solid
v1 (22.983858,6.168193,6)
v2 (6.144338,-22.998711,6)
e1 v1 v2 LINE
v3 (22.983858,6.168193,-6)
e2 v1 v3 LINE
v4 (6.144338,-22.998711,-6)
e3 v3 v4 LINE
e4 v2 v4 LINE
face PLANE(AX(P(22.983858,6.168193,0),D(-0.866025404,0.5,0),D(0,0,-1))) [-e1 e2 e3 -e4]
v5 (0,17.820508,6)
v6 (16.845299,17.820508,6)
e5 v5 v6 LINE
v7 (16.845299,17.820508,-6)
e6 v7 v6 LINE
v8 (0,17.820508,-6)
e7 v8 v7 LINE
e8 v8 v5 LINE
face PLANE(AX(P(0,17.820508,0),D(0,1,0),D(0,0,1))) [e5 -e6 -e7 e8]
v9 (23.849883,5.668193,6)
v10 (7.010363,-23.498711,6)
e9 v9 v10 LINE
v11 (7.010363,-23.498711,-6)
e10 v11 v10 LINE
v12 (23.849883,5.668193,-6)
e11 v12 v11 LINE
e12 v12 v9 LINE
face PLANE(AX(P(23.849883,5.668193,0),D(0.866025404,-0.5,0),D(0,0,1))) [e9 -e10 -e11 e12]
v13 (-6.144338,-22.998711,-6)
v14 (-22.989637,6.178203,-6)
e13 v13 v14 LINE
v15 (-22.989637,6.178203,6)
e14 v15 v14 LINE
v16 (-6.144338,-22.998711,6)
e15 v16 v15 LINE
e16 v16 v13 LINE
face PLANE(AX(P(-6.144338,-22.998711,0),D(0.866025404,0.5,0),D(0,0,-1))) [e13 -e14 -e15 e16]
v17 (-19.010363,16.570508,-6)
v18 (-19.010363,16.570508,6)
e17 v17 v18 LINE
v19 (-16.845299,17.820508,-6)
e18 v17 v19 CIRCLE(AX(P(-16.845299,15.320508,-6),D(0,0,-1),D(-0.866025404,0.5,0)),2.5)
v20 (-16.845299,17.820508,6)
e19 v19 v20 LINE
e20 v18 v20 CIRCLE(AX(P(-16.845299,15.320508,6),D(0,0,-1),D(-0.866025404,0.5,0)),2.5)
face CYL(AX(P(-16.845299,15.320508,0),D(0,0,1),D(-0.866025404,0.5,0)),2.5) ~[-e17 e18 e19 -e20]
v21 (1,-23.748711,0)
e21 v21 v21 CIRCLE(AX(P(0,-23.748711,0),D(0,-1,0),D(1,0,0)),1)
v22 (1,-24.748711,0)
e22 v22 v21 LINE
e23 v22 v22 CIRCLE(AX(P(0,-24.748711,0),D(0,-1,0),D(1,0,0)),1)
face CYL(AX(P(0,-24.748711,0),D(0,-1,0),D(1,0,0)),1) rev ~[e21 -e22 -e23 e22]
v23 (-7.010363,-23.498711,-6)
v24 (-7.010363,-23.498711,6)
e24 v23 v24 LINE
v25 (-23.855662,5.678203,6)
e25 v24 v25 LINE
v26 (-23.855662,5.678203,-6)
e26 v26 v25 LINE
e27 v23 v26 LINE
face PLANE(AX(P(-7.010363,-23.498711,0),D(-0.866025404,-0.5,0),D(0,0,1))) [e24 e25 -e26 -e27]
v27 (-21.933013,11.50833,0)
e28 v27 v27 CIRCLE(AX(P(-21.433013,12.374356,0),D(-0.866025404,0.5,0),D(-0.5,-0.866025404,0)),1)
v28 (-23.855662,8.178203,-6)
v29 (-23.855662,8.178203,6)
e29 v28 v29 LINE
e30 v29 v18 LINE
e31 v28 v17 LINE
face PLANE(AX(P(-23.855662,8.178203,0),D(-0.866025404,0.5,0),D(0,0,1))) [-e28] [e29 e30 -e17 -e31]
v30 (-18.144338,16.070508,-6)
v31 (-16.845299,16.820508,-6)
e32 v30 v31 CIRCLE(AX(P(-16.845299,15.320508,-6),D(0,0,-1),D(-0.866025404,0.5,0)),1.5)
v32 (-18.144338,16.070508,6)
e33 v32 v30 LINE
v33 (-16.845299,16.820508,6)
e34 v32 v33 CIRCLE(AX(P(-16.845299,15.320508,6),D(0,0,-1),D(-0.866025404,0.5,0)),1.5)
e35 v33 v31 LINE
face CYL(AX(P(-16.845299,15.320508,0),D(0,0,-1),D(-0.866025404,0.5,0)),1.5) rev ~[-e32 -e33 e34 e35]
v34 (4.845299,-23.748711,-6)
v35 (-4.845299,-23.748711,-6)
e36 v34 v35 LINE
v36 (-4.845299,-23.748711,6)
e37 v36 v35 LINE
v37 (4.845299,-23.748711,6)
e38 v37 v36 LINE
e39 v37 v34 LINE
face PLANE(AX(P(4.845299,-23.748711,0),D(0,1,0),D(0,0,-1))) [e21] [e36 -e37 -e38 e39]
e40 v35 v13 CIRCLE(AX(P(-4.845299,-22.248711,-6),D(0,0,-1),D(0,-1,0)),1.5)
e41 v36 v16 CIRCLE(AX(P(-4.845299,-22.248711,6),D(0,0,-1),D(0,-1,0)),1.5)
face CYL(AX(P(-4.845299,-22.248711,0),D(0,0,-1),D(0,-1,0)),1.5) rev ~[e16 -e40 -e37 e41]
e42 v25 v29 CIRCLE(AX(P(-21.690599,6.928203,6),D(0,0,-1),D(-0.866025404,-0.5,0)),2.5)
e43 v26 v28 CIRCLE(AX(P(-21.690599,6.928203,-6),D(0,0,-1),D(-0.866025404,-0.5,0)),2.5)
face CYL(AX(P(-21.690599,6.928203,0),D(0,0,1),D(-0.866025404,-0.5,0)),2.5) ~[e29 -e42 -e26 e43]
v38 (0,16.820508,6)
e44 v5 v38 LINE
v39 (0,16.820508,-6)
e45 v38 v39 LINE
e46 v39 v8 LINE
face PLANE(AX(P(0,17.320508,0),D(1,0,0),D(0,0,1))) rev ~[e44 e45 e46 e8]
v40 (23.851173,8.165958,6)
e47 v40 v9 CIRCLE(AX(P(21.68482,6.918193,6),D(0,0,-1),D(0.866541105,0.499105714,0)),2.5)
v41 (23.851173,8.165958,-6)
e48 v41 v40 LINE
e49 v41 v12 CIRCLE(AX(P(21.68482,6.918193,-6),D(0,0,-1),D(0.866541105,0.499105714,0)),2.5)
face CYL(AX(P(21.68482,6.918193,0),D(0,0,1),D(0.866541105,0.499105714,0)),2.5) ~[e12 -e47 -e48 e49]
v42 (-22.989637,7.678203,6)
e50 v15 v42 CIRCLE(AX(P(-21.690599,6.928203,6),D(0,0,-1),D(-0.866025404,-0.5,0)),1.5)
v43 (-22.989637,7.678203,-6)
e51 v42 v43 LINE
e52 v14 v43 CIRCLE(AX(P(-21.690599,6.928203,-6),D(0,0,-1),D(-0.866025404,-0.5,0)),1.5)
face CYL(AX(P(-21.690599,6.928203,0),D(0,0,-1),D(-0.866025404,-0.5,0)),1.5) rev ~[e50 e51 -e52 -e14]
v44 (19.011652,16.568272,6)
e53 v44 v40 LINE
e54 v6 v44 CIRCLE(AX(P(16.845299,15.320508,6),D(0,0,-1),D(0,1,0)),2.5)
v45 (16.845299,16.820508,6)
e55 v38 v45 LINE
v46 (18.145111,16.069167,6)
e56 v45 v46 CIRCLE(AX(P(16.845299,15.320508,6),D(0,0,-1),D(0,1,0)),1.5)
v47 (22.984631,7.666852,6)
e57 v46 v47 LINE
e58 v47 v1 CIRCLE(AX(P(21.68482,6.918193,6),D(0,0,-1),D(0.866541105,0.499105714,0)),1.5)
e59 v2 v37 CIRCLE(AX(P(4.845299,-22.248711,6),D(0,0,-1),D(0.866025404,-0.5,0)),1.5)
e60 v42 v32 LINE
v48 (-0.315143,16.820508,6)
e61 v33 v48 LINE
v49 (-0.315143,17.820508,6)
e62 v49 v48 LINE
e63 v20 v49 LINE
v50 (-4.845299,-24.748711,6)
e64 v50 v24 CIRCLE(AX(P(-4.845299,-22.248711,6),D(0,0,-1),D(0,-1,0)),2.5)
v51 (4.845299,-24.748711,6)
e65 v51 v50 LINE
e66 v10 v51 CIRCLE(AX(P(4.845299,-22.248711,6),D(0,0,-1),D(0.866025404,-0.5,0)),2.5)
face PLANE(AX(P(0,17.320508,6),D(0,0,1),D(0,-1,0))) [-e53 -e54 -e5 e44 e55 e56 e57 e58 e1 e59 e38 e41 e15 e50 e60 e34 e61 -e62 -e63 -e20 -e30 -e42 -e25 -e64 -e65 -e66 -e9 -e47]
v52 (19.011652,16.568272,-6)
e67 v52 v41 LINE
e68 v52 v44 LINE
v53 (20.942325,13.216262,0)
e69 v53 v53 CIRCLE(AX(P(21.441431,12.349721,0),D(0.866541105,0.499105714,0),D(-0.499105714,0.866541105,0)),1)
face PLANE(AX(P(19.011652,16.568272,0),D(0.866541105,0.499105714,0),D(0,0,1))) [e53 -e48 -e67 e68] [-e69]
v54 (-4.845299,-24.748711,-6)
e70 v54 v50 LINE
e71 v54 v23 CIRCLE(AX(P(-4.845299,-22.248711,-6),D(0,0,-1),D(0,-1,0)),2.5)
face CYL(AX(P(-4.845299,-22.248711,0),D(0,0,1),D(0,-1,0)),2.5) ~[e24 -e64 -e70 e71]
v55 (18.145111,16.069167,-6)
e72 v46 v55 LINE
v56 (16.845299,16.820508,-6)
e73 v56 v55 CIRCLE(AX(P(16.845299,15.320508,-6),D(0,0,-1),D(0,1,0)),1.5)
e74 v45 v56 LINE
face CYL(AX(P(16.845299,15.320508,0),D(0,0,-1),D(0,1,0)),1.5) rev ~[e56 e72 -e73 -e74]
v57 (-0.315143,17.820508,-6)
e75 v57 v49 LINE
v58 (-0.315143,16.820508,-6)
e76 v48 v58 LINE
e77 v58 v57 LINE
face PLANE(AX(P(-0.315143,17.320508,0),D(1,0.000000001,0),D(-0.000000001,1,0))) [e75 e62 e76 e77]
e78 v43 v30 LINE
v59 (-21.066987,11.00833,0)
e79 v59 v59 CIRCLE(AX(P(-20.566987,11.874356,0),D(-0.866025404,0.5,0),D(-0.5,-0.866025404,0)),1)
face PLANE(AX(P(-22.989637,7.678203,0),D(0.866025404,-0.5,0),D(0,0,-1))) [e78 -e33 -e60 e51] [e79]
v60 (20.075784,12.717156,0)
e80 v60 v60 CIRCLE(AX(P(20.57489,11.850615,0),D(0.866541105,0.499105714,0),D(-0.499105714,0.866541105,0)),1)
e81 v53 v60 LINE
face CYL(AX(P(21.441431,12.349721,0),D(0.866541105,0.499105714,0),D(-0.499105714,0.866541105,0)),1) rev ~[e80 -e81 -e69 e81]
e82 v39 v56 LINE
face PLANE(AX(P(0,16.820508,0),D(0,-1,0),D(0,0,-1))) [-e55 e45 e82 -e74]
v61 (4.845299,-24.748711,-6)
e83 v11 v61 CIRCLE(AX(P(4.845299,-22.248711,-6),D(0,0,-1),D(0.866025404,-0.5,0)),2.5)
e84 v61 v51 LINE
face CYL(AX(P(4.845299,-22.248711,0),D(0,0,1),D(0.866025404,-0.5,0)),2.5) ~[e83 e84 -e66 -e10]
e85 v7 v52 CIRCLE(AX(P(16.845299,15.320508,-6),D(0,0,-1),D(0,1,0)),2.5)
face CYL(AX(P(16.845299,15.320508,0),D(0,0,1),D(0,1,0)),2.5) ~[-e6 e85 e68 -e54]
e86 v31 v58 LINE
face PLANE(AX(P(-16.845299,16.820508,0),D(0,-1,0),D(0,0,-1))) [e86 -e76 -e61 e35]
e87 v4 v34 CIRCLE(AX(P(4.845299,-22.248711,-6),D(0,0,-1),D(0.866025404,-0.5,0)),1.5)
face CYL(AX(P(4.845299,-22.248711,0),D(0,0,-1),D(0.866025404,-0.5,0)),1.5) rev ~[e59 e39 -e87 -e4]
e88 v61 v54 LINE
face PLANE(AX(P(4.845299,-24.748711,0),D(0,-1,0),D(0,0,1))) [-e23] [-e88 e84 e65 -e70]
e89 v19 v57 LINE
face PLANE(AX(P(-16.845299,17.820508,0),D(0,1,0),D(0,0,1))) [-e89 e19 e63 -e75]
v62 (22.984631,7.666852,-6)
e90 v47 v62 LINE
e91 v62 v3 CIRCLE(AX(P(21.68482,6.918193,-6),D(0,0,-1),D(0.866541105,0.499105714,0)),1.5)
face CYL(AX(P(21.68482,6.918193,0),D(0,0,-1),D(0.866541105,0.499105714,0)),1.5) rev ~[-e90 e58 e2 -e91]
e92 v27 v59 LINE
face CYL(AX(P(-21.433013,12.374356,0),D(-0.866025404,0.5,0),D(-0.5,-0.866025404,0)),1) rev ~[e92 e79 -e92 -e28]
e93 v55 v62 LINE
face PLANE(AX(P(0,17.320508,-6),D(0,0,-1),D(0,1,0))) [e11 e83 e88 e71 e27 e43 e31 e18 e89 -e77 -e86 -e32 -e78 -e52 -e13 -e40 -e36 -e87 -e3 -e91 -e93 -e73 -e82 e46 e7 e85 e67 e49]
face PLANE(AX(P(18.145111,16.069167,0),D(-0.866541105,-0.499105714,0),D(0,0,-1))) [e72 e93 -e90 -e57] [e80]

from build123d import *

# Parameters (mm, degrees)
F1_W     = 1
F1_H     = 12
F3_R     = 1
F4_DEPTH = 1
F5_R     = 1
F6_DEPTH = 1
F7_R     = 1
F8_DEPTH = 1


with BuildPart() as f2:
    # F2: sweep along a path in F0
    with BuildLine(Plane.XY) as f2_path:
        Line((0, 17.3205080757), (0.268994947, 17.3205080757))
        Line((0.268994947, 17.3205080757), (16.8452994616, 17.3205080757))
        ThreePointArc((16.8452994616, 17.3205080757), (17.8461933486, 17.0520424897), (18.5783816717, 16.3187195027))
        Line((18.5783816717, 16.3187195027), (23.4179019593, 7.9164048343))
        ThreePointArc((23.4179019593, 7.9164048343), (23.6848194828, 6.9171610817), (23.4168705568, 5.9181934072))
        Line((23.4168705568, 5.9181934072), (6.5773502692, -23.248711306))
        ThreePointArc((6.5773502692, -23.248711306), (5.8452994616, -23.9807621135), (4.8452994616, -24.248711306))
        Line((4.8452994616, -24.248711306), (-4.8452994616, -24.248711306))
        ThreePointArc((-4.8452994616, -24.248711306), (-5.8452994616, -23.9807621135), (-6.5773502692, -23.248711306))
        Line((-6.5773502692, -23.248711306), (-23.4226497308, 5.9282032303))
        ThreePointArc((-23.4226497308, 5.9282032303), (-23.6905989232, 6.9282032303), (-23.4226497308, 7.9282032303))
        Line((-23.4226497308, 7.9282032303), (-18.5773502692, 16.3205080757))
        ThreePointArc((-18.5773502692, 16.3205080757), (-17.8452994616, 17.0525588833), (-16.8452994616, 17.3205080757))
        Line((-16.8452994616, 17.3205080757), (-0.3151426208, 17.3205080757))
    # F1 (on Right) → F2 (sweep)
    with BuildSketch(Plane.YZ):
        with Locations((17.3205080757, 0)):
            Rectangle(F1_W, F1_H)
    sweep(path=f2_path.line)

    # F3 (on face) → F4 (cut, through all)
    with BuildSketch(Plane.XZ.offset(24.748711306)):
        Circle(F3_R)
    extrude(amount=-F4_DEPTH, mode=Mode.SUBTRACT)

    # F5 (on face) → F6 (cut, through all)
    with BuildSketch(Plane(origin=(21.441430996, 12.3497208085, 0), x_dir=(-0.4991057135, 0.866541105, 0), z_dir=(0.866541105, 0.4991057135, 0))):
        Circle(F5_R)
    extrude(amount=-F6_DEPTH, mode=Mode.SUBTRACT)

    # F7 (on face) → F8 (cut, through all)
    with BuildSketch(Plane(origin=(-21.4330127019, 12.374355653, 0), x_dir=(-0.5, -0.8660254038, 0), z_dir=(-0.8660254038, 0.5, 0))):
        Circle(F7_R)
    extrude(amount=-F8_DEPTH, mode=Mode.SUBTRACT)


solid = f2.part
